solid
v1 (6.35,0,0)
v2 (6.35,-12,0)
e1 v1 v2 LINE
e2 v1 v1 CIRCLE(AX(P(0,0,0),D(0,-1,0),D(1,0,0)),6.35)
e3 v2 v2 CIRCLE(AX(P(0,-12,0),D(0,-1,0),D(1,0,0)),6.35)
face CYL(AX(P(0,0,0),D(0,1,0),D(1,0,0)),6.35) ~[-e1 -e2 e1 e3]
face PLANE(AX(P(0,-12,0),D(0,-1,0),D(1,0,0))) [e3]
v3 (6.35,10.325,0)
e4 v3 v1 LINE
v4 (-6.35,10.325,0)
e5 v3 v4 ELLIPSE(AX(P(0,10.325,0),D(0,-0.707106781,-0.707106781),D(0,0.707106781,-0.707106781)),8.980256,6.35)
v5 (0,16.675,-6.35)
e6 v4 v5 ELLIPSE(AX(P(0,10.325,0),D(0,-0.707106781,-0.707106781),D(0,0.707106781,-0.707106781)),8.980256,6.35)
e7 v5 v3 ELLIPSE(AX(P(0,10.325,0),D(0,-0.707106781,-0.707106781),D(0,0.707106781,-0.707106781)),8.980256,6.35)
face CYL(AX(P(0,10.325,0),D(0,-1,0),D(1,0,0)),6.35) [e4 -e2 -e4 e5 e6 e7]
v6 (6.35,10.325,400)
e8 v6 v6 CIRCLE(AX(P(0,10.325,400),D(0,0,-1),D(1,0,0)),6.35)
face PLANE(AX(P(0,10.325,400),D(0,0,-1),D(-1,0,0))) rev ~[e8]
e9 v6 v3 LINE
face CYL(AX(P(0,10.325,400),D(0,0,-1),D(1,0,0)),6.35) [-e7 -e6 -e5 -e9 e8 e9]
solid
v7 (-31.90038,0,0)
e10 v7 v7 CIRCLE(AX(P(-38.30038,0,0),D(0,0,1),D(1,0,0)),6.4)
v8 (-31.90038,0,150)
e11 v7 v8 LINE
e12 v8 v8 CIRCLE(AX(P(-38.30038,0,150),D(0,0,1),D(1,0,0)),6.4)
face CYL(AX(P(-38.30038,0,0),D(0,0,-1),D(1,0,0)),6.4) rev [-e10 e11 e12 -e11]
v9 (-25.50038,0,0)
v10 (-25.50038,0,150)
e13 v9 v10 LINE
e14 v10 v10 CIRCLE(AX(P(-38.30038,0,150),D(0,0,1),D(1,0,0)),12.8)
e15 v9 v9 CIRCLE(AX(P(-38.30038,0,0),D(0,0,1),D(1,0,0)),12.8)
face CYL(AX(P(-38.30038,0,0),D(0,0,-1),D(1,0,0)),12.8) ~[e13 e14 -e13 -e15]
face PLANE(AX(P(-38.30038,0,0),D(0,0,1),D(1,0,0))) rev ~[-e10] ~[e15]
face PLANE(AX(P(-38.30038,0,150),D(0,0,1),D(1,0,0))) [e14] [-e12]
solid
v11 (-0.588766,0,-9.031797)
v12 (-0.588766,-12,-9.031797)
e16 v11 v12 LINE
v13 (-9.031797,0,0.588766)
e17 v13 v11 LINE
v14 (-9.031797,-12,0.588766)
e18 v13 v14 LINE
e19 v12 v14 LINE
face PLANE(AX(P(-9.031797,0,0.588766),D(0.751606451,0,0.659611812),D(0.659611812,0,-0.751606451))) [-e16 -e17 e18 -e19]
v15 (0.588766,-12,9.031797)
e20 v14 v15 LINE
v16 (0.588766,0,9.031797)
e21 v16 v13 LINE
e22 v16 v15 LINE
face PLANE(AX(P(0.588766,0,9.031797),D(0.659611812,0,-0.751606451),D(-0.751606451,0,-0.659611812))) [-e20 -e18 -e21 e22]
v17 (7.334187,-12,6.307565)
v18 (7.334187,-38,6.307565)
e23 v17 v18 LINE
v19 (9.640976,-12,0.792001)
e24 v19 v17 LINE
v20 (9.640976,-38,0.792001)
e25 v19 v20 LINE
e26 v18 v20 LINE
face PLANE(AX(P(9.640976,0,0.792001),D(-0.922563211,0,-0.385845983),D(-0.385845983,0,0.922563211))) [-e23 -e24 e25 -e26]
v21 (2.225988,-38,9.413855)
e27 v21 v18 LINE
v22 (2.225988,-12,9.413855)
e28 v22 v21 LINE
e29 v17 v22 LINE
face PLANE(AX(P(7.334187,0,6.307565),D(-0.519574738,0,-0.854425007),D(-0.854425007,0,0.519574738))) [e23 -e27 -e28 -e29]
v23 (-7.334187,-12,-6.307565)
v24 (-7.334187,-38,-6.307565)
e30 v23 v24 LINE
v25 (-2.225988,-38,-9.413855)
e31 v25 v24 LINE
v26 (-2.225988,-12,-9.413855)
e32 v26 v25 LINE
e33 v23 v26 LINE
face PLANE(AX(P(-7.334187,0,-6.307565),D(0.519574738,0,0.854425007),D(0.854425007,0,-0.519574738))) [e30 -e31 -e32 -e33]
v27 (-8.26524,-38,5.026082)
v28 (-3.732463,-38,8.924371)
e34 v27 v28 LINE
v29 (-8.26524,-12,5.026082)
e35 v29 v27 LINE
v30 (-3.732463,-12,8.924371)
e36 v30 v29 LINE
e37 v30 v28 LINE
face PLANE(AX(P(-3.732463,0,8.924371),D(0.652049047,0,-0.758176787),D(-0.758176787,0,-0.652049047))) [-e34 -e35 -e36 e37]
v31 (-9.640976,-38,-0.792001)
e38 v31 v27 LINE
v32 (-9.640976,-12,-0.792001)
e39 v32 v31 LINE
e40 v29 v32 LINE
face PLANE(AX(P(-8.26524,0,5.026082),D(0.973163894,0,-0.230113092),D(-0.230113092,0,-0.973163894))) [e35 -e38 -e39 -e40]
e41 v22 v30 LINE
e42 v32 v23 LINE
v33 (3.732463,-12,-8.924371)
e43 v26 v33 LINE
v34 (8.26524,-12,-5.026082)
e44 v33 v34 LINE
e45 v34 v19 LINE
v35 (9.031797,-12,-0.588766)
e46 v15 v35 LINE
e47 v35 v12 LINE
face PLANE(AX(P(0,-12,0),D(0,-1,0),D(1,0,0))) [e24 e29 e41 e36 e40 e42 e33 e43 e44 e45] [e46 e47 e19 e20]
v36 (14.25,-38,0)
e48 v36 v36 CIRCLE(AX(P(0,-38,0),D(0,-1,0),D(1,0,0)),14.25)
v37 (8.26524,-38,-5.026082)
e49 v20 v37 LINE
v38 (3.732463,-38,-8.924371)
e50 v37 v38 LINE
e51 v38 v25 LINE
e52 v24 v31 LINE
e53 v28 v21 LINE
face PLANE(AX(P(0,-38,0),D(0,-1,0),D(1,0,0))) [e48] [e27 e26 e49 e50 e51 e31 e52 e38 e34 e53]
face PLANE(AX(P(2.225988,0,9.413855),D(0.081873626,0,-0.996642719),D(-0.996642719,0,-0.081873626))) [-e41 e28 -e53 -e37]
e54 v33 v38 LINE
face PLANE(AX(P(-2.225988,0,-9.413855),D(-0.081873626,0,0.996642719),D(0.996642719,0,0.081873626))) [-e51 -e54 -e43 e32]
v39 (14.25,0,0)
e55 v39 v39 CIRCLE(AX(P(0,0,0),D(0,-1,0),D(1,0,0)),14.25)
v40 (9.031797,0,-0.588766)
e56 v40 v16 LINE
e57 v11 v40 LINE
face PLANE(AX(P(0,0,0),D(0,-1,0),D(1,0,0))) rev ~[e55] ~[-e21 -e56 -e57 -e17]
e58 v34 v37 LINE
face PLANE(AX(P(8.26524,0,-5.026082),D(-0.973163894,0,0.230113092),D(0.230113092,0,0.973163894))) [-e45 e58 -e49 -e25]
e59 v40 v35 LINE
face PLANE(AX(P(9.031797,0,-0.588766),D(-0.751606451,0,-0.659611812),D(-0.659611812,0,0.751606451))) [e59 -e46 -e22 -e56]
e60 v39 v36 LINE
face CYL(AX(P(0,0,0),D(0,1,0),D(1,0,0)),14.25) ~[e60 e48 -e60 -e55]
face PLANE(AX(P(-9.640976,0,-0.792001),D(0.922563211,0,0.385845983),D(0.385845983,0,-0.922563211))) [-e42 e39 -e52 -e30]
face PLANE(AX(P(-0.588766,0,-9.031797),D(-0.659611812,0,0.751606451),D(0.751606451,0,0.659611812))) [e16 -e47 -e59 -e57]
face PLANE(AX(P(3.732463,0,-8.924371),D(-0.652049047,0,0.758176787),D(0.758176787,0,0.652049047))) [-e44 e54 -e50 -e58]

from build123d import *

# Parameters (mm, degrees)
F0_R      = 14.25
F1_DEPTH  = 38
F3_DEPTH  = 40
F4_DEPTH  = 12
F6_DEPTH  = 15
F7_R      = 6.35
F10_R     = 12.8
F10_R_2   = 6.4
F11_DEPTH = 150
F12_DEPTH = 12


with BuildPart() as f1:
    # F0 (on Front) → F1 (new body)
    with BuildSketch(Plane.XZ):
        Circle(F0_R)
    extrude(amount=F1_DEPTH)

    # F2 (on Front) → F3 (cut)
    with BuildSketch(Plane.XZ):
        Polygon((3.7324627706, -8.9243713627), (8.2652396853, -5.0260815253), (9.6409759653, 0.7920006246), (7.3341871114, 6.307565455), (2.2259880607, 9.4138546678), (-3.7324627706, 8.9243713627), (-8.2652396853, 5.0260815253), (-9.6409759653, -0.7920006246), (-7.3341871114, -6.307565455), (-2.2259880607, -9.4138546678), align=None)
    extrude(amount=F3_DEPTH, mode=Mode.SUBTRACT)

    # F2 (on Front) → F4 (join)
    with BuildSketch(Plane.XZ):
        Polygon((3.7324627706, -8.9243713627), (8.2652396853, -5.0260815253), (9.6409759653, 0.7920006246), (7.3341871114, 6.307565455), (2.2259880607, 9.4138546678), (-3.7324627706, 8.9243713627), (-8.2652396853, 5.0260815253), (-9.6409759653, -0.7920006246), (-7.3341871114, -6.307565455), (-2.2259880607, -9.4138546678), align=None)
    extrude(amount=F4_DEPTH)

    # F5 (on Front) → F6 (cut)
    with BuildSketch(Plane.XZ):
        Polygon((-0.588765686, -9.0317968847), (9.0317968847, -0.588765686), (0.588765686, 9.0317968847), (-9.0317968847, 0.588765686), align=None)
    extrude(amount=F6_DEPTH, mode=Mode.SUBTRACT)


with BuildPart() as f9:
    # F9: sweep along a path in F8
    with BuildLine(Plane.YZ) as f9_path:
        Line((10.325, 400), (10.325, 0))
        Line((10.325, 0), (0, 0))
    # F7 (on Front) → F9 (sweep)
    with BuildSketch(Plane.XZ):
        Circle(F7_R)
    sweep(path=f9_path.line, transition=Transition.RIGHT)

    # F7 (on Front) → F12 (join)
    with BuildSketch(Plane.XZ):
        Circle(F7_R)
    extrude(amount=F12_DEPTH)


with BuildPart() as f11:
    # F10 (on Top) → F11 (new body)
    with BuildSketch(Plane.XY):
        with Locations((-38.3003803454, 0)):
            Circle(F10_R)
        with Locations((-38.3003803454, 0)):
            Circle(F10_R_2, mode=Mode.SUBTRACT)
    extrude(amount=F11_DEPTH)


solid = Compound([f1.part, f9.part, f11.part])
